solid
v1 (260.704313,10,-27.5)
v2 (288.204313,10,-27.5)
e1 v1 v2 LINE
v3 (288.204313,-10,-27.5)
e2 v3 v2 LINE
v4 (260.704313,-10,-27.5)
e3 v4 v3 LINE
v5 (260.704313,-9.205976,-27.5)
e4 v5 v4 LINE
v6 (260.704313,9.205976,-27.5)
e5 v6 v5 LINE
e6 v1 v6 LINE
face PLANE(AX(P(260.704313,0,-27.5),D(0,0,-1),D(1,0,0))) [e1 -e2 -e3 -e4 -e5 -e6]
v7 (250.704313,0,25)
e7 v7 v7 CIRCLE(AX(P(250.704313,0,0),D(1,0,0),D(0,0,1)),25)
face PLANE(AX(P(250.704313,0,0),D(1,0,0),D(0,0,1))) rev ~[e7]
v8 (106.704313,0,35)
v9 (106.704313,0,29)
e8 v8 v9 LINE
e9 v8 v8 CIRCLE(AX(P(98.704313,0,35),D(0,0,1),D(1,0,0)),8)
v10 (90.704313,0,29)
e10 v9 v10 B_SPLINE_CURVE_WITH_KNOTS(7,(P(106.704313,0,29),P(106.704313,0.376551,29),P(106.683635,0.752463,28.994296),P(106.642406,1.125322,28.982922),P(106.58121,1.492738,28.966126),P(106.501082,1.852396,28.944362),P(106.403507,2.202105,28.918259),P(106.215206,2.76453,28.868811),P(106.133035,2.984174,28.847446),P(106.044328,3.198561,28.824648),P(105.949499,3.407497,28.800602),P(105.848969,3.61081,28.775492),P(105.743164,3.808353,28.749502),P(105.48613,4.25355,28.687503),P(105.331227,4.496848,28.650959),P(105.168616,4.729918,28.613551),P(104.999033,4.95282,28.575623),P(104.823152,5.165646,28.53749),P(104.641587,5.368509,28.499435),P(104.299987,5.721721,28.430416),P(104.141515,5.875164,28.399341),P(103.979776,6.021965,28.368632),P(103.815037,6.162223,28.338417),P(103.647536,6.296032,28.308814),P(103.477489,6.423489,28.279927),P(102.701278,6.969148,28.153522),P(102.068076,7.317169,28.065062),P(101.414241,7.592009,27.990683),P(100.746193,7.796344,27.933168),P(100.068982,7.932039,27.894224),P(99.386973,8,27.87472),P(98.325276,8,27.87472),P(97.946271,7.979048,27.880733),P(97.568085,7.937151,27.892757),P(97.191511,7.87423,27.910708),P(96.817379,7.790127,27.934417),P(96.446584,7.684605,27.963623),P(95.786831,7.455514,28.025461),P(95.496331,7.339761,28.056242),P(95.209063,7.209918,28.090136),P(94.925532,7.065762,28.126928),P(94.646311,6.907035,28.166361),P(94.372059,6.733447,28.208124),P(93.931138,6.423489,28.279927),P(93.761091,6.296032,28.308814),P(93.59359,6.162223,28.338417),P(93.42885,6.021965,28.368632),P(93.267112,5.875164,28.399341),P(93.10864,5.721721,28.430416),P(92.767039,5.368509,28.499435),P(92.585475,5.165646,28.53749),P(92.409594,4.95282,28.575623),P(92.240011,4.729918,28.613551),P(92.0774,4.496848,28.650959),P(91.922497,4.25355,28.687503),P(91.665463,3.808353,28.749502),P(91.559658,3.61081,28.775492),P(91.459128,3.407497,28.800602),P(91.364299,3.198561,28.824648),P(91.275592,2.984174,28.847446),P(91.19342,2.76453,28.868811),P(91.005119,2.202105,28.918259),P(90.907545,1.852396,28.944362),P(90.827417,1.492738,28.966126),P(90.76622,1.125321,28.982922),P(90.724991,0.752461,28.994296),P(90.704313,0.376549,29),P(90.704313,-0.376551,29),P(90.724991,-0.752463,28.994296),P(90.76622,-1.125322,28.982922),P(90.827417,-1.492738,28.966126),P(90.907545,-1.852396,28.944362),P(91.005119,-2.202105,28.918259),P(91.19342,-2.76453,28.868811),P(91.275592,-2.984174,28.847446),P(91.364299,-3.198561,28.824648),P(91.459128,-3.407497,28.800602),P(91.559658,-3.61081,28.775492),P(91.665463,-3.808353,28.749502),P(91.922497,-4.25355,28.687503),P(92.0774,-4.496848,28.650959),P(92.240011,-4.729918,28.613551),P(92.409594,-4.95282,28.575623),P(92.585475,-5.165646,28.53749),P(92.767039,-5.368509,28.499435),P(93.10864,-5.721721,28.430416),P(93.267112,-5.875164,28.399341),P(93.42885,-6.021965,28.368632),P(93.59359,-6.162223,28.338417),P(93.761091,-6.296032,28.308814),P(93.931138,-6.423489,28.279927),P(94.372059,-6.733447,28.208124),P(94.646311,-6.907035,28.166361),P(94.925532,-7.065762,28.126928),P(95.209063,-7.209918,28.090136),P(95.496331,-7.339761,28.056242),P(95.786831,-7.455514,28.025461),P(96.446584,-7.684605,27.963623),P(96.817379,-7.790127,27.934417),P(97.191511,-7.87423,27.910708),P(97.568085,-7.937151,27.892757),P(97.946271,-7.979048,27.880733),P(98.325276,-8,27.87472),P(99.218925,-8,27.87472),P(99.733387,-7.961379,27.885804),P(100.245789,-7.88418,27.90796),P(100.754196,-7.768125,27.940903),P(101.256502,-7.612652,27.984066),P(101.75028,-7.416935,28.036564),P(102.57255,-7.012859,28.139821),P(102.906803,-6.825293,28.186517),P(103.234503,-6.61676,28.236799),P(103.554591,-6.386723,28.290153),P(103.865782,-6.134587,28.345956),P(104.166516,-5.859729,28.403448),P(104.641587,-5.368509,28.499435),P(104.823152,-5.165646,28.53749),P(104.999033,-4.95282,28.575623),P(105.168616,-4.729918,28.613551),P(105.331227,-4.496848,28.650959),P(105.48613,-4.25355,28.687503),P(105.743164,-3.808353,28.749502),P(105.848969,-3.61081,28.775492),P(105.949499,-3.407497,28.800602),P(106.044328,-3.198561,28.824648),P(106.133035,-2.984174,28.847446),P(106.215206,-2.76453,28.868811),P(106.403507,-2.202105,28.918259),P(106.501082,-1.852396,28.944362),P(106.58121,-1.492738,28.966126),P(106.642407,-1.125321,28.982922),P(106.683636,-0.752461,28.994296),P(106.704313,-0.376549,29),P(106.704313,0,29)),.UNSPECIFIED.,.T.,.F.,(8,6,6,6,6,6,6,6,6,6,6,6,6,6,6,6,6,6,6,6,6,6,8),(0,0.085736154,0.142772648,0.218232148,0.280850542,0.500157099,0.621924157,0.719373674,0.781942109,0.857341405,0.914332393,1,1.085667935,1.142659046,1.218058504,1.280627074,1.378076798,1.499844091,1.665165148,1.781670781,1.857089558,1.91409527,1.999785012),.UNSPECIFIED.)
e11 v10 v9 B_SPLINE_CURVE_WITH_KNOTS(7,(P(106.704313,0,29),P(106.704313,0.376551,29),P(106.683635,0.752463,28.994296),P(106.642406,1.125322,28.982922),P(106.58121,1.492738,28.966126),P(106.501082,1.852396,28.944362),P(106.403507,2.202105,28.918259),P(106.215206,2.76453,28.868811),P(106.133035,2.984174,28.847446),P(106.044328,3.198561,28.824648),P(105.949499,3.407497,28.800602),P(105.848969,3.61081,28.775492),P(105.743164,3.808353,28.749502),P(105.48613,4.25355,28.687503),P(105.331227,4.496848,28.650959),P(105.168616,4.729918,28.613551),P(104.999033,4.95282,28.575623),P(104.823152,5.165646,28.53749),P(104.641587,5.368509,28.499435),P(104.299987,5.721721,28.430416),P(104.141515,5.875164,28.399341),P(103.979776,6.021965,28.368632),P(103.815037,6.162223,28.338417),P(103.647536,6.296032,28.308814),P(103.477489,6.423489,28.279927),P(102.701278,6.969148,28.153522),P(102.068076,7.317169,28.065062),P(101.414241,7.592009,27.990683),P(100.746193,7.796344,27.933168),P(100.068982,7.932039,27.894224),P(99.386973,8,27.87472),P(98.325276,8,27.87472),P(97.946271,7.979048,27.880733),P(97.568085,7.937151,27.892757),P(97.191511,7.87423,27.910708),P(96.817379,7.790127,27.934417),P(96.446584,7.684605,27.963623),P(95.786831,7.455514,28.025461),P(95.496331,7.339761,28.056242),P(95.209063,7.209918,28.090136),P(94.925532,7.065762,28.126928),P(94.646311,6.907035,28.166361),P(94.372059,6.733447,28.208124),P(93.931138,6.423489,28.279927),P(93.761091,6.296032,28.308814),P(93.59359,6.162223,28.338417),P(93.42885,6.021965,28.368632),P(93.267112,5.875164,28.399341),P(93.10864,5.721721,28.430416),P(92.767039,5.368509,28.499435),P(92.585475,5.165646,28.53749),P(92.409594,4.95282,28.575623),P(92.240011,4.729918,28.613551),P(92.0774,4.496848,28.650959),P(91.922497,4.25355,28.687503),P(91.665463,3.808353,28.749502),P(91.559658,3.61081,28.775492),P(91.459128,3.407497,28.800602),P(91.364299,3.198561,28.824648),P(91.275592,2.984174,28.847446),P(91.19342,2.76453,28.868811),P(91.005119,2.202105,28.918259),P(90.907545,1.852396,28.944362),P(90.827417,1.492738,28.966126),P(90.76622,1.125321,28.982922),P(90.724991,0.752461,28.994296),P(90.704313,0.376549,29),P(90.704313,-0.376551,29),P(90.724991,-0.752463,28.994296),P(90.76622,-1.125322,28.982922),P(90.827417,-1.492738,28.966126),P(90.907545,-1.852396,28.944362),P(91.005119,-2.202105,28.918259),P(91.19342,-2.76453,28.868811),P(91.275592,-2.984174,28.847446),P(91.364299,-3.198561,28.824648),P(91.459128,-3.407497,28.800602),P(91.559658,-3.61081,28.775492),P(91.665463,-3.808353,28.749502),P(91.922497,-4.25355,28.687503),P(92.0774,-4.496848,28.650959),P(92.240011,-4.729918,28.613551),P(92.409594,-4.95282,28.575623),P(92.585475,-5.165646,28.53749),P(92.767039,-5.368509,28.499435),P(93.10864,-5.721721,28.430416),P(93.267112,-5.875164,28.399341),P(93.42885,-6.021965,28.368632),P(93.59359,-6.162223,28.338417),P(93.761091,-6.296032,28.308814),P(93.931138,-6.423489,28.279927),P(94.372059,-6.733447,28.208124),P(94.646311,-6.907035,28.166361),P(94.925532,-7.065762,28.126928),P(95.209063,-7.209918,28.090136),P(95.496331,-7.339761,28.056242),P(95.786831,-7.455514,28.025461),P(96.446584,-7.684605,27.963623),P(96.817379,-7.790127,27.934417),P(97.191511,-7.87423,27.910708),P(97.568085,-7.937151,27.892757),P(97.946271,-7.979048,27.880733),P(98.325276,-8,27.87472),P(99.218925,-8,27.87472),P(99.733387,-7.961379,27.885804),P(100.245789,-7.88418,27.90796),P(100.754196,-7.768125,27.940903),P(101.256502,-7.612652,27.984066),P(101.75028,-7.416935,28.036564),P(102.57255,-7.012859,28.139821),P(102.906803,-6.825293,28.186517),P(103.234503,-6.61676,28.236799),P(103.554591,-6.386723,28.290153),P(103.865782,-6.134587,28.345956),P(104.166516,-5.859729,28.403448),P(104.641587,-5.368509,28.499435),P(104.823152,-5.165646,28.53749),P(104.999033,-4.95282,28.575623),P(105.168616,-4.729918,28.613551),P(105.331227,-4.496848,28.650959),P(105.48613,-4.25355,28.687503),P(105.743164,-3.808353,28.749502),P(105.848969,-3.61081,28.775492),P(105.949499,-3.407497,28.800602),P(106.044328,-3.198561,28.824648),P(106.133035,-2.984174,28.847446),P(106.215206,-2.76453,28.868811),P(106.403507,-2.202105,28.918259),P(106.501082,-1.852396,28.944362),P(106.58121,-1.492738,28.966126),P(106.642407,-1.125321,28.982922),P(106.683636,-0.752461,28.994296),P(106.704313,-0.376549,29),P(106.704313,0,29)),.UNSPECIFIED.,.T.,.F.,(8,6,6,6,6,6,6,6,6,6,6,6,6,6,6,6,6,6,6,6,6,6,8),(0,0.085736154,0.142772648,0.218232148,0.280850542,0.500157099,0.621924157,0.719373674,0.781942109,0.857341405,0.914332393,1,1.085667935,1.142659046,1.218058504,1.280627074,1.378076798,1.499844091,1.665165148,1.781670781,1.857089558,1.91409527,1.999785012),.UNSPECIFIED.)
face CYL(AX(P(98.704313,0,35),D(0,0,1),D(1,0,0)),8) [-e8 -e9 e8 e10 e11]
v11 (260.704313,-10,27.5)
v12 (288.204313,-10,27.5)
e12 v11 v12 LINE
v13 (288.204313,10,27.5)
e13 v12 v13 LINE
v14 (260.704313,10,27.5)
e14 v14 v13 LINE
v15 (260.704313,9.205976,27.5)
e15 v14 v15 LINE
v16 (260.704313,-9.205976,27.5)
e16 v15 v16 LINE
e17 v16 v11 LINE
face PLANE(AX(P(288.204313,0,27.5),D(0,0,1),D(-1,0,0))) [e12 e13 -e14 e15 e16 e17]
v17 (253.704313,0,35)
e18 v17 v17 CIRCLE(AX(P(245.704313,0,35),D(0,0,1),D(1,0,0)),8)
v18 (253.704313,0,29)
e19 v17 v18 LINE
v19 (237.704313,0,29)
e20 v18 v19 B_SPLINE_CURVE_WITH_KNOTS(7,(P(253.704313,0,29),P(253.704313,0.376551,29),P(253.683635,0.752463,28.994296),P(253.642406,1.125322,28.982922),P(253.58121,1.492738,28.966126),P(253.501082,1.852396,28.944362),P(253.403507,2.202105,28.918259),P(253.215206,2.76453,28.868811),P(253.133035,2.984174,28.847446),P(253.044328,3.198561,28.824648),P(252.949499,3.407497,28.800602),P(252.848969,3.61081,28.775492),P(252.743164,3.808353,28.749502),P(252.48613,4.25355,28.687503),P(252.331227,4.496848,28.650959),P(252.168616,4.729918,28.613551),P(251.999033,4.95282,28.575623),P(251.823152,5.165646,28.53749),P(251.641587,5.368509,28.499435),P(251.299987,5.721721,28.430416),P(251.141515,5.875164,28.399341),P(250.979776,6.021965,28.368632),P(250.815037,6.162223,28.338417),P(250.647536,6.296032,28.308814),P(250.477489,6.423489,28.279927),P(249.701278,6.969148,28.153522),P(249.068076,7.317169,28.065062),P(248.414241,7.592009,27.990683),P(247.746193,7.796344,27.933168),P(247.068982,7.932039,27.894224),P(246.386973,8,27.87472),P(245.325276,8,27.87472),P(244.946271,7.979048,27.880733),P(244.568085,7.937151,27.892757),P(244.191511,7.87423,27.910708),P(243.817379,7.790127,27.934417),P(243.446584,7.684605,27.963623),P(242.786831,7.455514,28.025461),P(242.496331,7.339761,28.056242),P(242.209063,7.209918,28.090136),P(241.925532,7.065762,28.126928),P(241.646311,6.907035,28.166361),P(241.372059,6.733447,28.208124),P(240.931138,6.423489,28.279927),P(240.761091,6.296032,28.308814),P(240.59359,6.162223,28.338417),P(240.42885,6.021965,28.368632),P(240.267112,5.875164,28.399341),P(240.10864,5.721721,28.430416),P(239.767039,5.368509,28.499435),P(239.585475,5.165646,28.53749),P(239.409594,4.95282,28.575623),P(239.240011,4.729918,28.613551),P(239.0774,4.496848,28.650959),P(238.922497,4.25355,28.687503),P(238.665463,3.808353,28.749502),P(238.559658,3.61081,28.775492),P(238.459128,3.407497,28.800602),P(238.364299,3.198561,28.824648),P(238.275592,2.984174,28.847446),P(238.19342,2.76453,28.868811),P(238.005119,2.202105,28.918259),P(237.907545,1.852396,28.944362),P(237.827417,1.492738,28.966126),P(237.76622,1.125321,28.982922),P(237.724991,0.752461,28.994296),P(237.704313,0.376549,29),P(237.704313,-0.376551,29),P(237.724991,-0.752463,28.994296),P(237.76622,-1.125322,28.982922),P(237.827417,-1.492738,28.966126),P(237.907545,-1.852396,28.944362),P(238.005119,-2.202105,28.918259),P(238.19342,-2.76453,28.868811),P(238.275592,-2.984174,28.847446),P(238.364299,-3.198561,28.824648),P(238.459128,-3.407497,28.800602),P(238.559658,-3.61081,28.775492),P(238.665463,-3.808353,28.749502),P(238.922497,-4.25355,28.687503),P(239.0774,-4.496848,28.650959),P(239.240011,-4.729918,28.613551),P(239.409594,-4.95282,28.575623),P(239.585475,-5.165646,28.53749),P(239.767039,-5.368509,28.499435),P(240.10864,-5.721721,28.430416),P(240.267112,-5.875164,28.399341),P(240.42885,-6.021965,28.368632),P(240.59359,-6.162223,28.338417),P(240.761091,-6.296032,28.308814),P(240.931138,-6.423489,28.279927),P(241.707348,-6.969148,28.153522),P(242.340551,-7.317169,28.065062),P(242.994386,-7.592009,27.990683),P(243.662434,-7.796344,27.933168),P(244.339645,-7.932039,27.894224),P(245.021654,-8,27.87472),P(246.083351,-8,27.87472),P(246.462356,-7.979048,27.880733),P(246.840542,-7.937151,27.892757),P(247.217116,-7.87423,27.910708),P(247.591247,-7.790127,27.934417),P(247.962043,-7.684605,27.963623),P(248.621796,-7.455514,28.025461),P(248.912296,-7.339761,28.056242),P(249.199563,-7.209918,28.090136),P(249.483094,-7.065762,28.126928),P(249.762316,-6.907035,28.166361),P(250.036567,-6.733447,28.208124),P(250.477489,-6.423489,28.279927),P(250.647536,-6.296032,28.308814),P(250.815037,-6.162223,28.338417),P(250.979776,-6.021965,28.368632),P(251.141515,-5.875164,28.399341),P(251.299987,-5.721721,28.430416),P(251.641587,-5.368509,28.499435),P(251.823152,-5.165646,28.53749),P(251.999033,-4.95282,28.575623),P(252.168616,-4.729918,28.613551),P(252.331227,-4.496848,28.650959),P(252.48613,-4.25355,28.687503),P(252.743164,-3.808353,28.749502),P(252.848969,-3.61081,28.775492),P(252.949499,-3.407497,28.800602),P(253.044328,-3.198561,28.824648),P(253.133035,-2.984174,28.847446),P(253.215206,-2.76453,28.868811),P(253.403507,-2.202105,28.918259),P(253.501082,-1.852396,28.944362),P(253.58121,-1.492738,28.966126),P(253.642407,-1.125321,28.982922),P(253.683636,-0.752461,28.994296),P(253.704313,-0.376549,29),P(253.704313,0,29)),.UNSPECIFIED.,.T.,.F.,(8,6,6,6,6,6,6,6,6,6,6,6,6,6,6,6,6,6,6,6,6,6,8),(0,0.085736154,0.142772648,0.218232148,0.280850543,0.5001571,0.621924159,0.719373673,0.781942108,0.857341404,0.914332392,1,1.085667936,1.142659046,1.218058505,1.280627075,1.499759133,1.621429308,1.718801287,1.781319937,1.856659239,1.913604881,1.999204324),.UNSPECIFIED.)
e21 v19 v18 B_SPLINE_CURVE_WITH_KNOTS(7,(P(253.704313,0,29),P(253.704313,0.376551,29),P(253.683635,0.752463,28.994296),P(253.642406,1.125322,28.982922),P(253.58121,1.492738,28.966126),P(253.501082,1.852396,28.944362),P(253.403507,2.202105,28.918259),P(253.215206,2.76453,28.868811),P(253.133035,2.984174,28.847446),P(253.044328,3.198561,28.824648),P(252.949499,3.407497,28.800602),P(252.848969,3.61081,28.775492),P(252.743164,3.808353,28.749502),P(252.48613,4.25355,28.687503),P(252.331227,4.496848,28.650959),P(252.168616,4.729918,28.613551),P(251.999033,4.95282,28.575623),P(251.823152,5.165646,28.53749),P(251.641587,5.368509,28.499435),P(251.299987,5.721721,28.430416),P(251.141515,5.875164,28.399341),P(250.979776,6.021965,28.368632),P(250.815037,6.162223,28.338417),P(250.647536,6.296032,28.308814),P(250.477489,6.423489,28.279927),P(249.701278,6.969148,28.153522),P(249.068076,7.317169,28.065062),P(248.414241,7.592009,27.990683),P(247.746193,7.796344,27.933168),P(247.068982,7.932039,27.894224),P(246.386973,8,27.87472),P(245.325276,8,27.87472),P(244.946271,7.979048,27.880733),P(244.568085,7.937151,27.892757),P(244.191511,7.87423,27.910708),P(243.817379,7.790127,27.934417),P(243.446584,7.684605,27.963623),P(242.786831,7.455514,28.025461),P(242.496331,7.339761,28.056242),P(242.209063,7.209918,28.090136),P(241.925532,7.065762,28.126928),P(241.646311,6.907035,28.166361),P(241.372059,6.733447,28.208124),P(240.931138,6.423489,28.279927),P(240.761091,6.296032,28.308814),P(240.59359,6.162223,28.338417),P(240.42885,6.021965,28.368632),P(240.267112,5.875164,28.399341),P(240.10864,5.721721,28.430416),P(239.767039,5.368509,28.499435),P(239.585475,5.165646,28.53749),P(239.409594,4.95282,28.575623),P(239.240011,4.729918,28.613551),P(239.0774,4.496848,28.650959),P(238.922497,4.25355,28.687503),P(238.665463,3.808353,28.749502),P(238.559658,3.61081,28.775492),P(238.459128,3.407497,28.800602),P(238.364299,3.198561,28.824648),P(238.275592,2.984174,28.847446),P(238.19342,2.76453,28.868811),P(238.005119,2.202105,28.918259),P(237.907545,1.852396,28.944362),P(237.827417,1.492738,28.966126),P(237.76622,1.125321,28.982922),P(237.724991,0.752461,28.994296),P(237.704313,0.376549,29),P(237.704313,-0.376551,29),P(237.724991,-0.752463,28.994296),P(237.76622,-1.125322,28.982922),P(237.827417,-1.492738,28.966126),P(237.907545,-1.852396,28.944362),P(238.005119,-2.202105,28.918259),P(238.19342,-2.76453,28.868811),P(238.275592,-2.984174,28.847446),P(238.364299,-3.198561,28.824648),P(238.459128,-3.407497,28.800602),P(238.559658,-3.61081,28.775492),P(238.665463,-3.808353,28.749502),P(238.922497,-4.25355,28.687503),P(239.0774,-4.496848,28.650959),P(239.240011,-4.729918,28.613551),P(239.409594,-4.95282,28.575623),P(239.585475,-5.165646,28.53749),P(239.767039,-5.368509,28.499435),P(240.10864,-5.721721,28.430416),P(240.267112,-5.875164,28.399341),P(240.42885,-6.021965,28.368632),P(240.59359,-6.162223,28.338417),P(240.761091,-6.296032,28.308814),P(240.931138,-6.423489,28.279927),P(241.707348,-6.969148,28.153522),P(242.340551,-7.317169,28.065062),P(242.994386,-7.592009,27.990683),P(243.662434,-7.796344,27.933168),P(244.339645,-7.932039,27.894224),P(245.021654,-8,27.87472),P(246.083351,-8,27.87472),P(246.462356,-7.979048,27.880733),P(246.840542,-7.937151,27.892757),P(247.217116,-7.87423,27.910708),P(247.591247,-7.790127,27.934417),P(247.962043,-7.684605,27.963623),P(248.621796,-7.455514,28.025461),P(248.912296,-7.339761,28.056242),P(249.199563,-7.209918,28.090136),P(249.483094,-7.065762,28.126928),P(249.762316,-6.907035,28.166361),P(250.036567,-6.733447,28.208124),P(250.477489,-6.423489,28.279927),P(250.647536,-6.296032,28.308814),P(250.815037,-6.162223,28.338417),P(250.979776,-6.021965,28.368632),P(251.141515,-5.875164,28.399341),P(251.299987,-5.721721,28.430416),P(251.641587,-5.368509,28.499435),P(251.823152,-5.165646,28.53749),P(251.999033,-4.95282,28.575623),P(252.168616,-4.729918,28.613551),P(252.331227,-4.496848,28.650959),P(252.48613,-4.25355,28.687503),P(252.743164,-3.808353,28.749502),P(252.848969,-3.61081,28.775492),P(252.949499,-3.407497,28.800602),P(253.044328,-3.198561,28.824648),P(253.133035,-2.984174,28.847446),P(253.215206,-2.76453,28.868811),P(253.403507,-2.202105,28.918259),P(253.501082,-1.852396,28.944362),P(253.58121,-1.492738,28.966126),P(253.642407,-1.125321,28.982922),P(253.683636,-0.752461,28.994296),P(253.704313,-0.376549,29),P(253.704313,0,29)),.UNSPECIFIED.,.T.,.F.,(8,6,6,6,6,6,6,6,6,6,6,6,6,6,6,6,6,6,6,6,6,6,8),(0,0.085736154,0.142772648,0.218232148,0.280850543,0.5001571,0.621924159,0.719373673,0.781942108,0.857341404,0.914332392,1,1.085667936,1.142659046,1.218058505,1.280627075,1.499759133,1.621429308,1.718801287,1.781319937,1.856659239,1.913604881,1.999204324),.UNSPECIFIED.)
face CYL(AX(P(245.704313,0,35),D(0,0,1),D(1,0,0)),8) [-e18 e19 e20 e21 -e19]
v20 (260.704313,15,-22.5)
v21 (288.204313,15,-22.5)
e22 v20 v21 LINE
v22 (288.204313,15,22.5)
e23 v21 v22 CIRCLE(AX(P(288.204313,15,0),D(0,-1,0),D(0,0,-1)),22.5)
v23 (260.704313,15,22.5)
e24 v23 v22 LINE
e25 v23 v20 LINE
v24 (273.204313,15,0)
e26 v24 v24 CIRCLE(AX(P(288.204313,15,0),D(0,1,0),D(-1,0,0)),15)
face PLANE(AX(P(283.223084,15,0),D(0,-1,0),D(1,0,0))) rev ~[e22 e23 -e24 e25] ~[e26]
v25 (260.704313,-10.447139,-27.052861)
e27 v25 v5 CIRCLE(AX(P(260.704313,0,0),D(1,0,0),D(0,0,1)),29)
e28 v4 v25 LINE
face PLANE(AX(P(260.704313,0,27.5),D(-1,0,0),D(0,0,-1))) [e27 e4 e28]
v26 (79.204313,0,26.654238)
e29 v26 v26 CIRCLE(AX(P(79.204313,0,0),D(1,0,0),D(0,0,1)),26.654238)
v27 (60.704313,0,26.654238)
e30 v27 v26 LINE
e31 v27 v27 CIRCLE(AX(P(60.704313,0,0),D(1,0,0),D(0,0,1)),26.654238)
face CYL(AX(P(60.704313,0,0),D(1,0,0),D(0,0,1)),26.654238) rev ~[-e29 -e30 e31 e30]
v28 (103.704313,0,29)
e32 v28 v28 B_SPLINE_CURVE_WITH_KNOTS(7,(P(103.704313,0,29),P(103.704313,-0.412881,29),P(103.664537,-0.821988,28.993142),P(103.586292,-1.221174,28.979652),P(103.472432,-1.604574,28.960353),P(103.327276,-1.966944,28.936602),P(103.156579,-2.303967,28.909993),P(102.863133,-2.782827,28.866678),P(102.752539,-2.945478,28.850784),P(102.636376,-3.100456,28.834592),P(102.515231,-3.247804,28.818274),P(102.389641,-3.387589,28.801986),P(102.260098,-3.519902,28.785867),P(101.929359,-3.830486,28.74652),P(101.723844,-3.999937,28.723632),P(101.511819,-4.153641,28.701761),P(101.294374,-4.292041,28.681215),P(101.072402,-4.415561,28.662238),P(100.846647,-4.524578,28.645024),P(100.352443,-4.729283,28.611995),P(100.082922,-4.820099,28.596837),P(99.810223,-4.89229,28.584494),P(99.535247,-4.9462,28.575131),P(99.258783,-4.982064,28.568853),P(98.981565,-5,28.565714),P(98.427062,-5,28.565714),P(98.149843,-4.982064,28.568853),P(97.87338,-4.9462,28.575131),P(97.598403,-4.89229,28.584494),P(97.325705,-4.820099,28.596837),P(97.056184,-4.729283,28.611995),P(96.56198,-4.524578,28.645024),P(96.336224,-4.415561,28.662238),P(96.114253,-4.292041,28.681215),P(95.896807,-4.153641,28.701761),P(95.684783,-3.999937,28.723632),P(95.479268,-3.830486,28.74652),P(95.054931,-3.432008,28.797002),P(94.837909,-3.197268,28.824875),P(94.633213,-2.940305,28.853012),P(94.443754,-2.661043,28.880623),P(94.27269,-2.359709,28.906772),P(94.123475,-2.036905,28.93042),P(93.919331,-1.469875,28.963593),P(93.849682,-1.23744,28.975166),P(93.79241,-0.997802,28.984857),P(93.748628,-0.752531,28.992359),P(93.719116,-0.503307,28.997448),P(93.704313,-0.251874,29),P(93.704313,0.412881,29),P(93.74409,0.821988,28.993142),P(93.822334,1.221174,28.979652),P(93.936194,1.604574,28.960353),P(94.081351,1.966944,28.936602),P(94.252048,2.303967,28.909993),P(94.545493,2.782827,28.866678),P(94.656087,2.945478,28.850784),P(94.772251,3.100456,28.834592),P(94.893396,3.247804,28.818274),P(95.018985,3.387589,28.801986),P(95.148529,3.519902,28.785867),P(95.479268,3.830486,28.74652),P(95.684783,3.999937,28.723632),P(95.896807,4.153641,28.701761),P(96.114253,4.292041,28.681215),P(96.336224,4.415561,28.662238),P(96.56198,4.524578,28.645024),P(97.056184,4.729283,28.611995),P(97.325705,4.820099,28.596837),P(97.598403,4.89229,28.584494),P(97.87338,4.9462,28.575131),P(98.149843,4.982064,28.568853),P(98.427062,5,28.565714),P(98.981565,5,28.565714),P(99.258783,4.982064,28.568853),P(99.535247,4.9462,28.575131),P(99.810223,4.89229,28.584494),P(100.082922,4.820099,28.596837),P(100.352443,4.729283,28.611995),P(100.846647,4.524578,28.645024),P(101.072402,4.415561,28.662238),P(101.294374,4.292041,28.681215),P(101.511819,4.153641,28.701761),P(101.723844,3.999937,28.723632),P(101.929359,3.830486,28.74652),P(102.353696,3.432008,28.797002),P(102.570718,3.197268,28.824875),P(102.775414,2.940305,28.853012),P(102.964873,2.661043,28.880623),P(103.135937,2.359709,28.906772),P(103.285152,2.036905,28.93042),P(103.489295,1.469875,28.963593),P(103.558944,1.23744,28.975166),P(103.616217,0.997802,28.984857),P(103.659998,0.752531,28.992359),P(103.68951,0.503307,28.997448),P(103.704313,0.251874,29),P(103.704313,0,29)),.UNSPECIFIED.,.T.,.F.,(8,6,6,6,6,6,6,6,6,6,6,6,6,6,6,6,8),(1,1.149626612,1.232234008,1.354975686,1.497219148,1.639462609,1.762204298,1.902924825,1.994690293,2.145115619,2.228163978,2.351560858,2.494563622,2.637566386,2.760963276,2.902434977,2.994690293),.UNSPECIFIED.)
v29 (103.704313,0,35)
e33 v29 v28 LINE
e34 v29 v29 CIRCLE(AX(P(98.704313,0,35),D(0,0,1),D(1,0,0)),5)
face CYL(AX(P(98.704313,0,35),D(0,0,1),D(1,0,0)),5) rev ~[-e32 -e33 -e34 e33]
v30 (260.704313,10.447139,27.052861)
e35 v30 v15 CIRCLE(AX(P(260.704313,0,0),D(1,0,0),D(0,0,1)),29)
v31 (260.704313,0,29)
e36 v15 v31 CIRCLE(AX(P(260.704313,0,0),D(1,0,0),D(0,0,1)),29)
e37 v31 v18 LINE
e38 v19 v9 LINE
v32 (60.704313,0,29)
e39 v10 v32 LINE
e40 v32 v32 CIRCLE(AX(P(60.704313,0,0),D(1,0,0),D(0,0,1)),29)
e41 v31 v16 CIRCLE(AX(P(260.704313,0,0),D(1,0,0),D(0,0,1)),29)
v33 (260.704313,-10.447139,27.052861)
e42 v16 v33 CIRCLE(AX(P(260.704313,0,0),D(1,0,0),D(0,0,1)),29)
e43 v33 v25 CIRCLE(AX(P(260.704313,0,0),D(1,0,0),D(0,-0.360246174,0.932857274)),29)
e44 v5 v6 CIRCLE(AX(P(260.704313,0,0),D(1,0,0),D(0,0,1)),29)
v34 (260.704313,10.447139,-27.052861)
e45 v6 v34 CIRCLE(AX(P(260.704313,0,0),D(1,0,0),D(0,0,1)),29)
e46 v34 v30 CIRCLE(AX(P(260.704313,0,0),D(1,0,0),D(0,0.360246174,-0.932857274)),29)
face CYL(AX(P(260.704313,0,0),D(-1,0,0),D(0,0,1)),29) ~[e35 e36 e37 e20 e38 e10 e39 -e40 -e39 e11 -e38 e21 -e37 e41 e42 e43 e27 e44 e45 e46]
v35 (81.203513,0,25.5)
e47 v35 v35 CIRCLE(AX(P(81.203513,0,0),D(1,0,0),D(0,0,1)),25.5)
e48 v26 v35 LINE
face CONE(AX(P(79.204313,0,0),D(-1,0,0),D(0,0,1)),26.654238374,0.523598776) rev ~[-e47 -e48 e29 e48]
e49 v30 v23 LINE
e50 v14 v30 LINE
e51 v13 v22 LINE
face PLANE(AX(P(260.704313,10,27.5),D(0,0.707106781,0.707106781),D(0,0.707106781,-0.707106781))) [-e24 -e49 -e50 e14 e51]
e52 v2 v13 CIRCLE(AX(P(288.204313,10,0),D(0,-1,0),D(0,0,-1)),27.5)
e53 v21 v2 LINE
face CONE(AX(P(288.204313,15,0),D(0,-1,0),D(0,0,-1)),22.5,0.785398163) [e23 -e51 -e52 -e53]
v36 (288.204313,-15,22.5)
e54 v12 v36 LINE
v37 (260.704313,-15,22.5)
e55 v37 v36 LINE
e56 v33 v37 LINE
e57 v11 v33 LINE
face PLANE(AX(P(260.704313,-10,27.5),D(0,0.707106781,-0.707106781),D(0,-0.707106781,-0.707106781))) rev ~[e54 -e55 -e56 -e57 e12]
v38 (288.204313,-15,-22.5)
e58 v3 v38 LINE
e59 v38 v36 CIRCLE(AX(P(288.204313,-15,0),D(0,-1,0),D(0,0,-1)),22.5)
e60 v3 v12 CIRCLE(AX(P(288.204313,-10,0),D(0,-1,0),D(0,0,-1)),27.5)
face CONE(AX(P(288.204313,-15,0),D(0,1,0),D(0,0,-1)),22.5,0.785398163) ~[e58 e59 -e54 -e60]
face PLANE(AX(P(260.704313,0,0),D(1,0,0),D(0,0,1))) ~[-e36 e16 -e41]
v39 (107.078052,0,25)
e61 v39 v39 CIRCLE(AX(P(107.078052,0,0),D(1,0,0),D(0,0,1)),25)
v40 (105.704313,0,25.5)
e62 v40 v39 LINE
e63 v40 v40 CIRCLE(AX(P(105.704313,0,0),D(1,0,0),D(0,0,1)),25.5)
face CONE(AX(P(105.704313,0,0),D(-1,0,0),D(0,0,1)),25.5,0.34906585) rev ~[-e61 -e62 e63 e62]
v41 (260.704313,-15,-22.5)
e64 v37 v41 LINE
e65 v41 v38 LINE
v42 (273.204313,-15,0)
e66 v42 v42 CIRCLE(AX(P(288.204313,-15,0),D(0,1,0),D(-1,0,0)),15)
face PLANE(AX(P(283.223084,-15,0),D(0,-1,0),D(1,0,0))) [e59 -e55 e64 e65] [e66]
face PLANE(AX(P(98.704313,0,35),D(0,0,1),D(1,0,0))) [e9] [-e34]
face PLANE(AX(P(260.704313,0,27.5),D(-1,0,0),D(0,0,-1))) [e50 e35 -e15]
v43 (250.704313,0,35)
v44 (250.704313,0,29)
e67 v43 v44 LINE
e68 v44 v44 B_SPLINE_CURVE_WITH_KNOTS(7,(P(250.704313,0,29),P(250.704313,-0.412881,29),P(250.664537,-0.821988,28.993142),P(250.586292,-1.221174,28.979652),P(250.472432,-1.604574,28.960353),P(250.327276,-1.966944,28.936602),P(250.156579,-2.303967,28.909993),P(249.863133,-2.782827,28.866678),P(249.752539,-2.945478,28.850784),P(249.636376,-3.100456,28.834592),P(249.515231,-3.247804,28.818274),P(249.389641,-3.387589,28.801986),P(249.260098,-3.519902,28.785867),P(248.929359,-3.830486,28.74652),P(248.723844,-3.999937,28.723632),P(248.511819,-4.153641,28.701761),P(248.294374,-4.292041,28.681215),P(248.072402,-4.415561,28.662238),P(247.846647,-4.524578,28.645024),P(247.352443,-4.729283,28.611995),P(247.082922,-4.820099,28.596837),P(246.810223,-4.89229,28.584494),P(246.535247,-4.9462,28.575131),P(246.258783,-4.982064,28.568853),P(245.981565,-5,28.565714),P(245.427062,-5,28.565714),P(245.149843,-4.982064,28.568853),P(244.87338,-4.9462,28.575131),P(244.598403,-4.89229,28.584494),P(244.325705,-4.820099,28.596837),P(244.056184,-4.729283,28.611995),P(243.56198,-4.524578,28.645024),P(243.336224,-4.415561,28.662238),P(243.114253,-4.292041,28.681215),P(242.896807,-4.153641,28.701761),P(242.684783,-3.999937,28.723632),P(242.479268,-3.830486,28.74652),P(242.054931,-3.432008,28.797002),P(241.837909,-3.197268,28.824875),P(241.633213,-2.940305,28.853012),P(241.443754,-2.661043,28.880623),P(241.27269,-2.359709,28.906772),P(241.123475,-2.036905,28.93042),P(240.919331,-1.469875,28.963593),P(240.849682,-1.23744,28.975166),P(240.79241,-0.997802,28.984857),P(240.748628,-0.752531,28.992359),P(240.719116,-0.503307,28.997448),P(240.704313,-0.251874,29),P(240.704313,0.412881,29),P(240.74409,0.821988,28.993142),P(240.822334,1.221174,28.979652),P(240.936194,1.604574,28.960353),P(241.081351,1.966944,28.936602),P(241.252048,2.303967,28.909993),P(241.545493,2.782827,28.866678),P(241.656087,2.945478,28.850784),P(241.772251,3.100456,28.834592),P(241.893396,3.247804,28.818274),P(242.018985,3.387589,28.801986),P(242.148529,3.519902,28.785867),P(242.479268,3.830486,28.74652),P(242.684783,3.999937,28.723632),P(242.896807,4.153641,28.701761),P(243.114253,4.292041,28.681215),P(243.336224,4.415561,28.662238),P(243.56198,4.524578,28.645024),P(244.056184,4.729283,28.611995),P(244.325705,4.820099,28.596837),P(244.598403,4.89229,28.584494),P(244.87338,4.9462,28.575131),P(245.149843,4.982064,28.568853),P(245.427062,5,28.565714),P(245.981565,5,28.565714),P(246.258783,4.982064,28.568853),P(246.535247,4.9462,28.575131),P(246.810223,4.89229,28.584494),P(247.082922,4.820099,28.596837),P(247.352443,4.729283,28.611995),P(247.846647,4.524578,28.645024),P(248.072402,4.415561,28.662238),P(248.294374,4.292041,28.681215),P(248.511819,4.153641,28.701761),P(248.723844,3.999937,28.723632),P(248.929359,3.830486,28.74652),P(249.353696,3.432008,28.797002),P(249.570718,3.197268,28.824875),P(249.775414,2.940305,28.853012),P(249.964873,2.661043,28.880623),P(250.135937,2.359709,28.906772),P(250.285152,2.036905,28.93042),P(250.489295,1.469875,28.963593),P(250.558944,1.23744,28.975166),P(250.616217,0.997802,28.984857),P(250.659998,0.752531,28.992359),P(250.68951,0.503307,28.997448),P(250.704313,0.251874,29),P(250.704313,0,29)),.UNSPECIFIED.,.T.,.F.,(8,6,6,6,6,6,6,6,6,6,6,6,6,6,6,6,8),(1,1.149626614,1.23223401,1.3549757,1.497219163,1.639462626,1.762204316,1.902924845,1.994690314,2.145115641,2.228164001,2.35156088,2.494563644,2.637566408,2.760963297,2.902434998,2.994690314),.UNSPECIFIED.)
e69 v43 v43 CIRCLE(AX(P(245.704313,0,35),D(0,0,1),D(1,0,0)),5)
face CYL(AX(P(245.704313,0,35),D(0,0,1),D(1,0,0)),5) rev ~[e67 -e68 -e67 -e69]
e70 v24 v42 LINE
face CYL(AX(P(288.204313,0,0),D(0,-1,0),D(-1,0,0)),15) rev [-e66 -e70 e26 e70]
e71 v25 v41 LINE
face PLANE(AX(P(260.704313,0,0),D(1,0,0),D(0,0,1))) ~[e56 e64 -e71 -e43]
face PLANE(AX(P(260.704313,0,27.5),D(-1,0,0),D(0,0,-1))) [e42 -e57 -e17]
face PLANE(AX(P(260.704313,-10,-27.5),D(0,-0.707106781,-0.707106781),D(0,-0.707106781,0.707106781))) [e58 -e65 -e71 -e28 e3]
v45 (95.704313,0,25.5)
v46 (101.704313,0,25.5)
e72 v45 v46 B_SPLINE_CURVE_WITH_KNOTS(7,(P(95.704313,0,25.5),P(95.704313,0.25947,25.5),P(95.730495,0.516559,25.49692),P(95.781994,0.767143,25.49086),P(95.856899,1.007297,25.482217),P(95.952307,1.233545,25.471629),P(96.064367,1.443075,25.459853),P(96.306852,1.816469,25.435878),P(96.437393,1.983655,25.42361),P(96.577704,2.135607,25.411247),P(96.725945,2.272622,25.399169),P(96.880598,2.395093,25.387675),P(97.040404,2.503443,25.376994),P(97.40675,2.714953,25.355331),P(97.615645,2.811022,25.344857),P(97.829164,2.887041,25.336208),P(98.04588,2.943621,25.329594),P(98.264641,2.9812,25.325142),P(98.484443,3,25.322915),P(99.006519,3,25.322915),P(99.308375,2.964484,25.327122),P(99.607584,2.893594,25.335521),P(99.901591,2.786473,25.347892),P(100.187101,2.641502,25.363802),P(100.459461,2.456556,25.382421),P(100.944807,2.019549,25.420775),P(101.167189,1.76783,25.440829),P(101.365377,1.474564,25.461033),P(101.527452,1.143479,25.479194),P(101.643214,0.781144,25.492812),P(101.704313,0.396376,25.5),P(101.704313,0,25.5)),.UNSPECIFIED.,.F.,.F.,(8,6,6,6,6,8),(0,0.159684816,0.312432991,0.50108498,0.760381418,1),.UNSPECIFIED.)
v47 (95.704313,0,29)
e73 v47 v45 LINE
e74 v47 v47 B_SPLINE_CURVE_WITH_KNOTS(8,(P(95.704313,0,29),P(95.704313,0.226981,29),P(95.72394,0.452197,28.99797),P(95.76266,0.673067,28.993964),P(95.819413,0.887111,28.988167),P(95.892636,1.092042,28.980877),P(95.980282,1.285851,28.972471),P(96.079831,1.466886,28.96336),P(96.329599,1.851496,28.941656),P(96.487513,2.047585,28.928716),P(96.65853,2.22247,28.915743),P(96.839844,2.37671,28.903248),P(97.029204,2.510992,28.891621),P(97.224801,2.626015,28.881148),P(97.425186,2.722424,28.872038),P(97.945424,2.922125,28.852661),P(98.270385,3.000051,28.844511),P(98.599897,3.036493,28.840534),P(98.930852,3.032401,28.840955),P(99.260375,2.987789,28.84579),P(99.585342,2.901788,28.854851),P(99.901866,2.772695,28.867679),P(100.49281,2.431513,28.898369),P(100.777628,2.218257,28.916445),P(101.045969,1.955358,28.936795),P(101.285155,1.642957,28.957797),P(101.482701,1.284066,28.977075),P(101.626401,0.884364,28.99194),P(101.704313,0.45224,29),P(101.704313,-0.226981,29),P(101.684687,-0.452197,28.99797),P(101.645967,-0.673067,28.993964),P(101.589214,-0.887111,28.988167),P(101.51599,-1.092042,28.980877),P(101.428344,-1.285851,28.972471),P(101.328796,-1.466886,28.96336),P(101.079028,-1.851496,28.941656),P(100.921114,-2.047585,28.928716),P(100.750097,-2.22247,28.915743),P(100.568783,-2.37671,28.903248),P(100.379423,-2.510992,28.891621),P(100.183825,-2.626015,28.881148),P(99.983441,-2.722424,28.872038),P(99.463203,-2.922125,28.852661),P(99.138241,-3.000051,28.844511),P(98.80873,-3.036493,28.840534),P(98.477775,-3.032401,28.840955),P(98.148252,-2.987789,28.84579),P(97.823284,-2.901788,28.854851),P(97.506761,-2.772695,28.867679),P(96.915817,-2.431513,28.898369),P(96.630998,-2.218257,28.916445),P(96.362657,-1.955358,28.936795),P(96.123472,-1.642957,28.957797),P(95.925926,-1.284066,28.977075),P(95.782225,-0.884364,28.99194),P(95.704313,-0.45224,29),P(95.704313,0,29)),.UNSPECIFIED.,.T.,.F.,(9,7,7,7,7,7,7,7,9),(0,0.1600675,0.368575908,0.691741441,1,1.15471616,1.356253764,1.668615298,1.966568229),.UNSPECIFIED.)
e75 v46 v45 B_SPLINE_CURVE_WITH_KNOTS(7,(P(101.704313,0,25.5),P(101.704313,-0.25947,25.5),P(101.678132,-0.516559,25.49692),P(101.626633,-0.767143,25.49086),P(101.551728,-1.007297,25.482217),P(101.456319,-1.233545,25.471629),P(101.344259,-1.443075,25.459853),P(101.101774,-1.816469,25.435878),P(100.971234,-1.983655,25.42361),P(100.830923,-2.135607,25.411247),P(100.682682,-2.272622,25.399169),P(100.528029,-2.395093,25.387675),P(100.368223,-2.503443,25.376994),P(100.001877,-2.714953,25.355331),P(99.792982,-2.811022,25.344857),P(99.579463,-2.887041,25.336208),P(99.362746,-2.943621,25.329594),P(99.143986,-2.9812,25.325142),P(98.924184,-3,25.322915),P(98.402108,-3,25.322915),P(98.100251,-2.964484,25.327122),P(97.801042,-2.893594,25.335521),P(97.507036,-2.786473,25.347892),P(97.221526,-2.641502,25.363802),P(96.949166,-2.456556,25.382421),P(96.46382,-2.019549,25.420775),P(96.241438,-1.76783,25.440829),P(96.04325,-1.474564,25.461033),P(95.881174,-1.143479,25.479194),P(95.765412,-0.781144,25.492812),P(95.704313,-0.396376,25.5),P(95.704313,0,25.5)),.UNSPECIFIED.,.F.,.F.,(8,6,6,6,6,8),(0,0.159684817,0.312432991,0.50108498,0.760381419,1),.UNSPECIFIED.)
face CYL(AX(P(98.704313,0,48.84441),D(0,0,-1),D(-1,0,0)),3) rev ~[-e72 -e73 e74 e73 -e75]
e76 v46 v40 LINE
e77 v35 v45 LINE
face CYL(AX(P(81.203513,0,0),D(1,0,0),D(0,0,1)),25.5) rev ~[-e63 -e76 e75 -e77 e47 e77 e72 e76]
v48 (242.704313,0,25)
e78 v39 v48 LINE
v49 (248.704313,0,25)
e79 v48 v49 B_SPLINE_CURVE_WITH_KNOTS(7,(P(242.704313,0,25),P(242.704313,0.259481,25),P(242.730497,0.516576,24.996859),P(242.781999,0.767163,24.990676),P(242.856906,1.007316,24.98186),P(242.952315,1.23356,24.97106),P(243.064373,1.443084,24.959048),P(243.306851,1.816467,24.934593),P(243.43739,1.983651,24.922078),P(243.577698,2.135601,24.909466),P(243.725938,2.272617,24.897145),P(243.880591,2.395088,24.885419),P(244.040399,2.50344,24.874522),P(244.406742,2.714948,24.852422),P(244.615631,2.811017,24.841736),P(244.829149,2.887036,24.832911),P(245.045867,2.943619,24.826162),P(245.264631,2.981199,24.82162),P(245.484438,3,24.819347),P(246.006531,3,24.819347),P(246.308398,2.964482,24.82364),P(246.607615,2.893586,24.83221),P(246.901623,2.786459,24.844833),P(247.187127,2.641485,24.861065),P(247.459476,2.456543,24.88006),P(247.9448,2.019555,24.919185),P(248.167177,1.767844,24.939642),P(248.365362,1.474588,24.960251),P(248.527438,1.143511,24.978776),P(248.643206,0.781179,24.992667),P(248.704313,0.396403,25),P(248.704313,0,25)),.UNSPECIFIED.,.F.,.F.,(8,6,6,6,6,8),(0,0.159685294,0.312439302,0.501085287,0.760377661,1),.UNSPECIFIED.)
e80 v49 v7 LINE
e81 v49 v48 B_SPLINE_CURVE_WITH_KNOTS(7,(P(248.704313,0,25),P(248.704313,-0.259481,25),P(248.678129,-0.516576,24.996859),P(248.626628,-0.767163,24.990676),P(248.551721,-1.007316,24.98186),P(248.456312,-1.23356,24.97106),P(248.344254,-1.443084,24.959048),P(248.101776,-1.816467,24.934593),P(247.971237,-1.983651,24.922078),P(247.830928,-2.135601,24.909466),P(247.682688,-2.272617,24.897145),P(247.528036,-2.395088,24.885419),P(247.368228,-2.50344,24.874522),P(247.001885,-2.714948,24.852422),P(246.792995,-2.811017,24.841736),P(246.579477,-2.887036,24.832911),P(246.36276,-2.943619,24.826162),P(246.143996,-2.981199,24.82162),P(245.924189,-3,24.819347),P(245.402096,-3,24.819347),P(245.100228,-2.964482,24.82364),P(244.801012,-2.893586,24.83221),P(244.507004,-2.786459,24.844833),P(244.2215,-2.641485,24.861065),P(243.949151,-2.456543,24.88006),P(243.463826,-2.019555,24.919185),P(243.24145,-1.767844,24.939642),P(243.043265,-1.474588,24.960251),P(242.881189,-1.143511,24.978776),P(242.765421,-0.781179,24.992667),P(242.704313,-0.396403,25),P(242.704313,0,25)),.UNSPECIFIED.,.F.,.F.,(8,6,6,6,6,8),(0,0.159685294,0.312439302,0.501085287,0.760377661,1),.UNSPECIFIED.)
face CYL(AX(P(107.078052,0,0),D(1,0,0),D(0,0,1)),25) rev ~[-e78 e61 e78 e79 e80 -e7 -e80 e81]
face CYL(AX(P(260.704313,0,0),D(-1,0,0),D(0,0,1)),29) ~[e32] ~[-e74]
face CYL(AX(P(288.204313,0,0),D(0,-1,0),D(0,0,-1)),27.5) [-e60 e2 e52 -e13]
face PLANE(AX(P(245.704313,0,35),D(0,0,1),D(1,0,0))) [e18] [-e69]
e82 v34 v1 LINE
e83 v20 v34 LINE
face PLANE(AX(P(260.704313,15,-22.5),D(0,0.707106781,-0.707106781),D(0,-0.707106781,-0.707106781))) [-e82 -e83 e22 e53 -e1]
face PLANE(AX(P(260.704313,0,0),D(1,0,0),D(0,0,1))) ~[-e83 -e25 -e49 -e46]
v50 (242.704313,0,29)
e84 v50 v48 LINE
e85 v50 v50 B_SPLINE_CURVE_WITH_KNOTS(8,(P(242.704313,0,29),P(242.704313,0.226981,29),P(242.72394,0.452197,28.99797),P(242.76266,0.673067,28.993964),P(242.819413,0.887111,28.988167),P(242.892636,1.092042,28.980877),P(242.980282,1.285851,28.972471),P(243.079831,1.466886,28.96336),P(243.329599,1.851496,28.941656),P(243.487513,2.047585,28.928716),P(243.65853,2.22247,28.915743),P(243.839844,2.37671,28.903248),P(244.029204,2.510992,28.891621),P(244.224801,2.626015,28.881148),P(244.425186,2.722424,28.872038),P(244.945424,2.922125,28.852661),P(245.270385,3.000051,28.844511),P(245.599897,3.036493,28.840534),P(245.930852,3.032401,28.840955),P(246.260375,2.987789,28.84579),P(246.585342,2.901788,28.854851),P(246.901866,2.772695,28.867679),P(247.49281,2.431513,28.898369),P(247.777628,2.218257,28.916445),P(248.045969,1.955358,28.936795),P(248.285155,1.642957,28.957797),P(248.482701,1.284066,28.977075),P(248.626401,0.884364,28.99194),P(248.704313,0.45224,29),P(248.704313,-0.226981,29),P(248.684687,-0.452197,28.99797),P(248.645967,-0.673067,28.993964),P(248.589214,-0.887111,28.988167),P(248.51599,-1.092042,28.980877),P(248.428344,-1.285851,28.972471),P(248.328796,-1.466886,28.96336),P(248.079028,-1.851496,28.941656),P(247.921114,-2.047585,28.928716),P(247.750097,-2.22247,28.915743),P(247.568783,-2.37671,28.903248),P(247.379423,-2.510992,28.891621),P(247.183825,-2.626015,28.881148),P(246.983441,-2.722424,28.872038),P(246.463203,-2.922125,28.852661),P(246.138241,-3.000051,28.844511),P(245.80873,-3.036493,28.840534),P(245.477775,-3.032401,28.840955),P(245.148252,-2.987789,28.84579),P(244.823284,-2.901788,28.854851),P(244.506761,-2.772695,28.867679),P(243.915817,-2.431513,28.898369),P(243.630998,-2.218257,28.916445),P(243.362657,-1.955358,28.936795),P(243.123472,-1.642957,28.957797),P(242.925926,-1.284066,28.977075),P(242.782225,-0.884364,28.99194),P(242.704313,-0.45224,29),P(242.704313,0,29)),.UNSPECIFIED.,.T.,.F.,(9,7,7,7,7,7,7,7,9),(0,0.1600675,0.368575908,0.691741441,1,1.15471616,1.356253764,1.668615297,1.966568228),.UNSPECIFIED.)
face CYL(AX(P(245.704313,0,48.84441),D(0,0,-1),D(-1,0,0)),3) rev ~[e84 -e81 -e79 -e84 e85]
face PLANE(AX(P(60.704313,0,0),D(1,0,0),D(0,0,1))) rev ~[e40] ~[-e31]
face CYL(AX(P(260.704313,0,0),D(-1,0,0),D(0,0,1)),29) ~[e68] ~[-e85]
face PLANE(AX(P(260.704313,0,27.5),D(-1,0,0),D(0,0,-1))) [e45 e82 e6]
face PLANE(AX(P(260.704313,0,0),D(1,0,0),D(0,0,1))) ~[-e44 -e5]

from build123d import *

# Parameters (mm, degrees)
F4_DEPTH    = 15
F5_T1_DEPTH = 27.5
F5_T4_ANGLE = 180
F5_T6_ANGLE = 180
F7_R        = 8
F7_R_2      = 5
F9_D        = 6
F9_DEPTH    = 20
F9_START    = 6.1555899
F9_TIP      = 1.8025818571
F10_D       = 6
F10_DEPTH   = 20
F10_START   = 6.1555899
F10_TIP     = 1.8025818571


# Not quite as in the source:
# - a fillet or chamfer that OpenCascade refuses, or shapes differently, is made with other operations: its cross-section is extruded or revolved along the edge and cut away or added


with BuildPart() as f3:
    # F2 (on Front) → F3 (revolve)
    with BuildSketch(Plane.XZ):
        Polygon((105.0486442498, 29), (98.7043133404, 29), (98.7043133404, 25.5), (105.7043133404, 25.5), (107.0780520501, 25), (250.7043133404, 25), (250.7043133404, 0), (260.7043133404, 0), (260.7043133404, 27.5), (260.7043133404, 29), align=None)
        Polygon((92.3599824309, 29), (60.7043133404, 29), (60.7043133404, 26.6542383736), (79.2043133404, 26.6542383736), (81.2035128474, 25.5), (98.7043133404, 25.5), (98.7043133404, 29), align=None)
    revolve(axis=Axis((125.4885941744, 0, 0), (1, 0, 0)))

    # F2 (on Front) → F4 (join, symmetric)
    with BuildSketch(Plane.XZ):
        with BuildLine():
            Line((288.2043133404, 27.5), (260.7043133404, 27.5))
            Line((260.7043133404, 27.5), (260.7043133404, 0))
            Line((260.7043133404, 0), (260.7043133404, -27.5))
            Line((260.7043133404, -27.5), (288.2043133404, -27.5))
            ThreePointArc((288.2043133404, -27.5), (315.7043133404, 0), (288.2043133404, 27.5))
        make_face()
        with BuildLine():
            ThreePointArc((303.2043133404, 0), (288.2043133404, -15), (273.2043133404, 0))
            ThreePointArc((273.2043133404, 0), (288.2043133404, 15), (303.2043133404, 0))
        make_face(mode=Mode.SUBTRACT)
    extrude(amount=F4_DEPTH, both=True)

    # F5: chamfer of 5 on 6 edges, made by hand

    # F5_s2 → F5_t1 (cut)
    with BuildSketch(Plane.YZ.offset(260.7043133404)):
        Polygon((-10, 27.5), (-15, 22.5), (-15, 27.5), align=None)
        Polygon((10, 27.5), (15, 22.5), (15, 27.5), align=None)
        Polygon((15, -22.5), (10, -27.5), (15, -27.5), align=None)
        Polygon((-10, -27.5), (-15, -22.5), (-15, -27.5), align=None)
    extrude(amount=F5_T1_DEPTH, mode=Mode.SUBTRACT)

    # F5_s3 → F5_t4 (revolve, cut)
    with BuildSketch(Plane.YZ.offset(288.2043133404)):
        Polygon((15, -22.5), (10, -27.5), (15, -27.5), align=None)
    revolve(axis=Axis((288.2043133404, 15, 0), (0, -1, 0)), revolution_arc=F5_T4_ANGLE, mode=Mode.SUBTRACT)

    # F5_s5 → F5_t6 (revolve, cut)
    with BuildSketch(Plane.YZ.offset(288.2043133404)):
        Polygon((-15, -22.5), (-10, -27.5), (-15, -27.5), align=None)
    revolve(axis=Axis((288.2043133404, -15, 0), (0, -1, 0)), revolution_arc=F5_T6_ANGLE, mode=Mode.SUBTRACT)

    # F7 (on offset) → F8 (join, up to the next surface of F3)
    with BuildSketch(Plane.XY.offset(35)):
        with Locations((98.7043133404, 0)):
            Circle(F7_R)
        with Locations((98.7043133404, 0)):
            Circle(F7_R_2, mode=Mode.SUBTRACT)
        with Locations((245.7043133404, 0)):
            Circle(F7_R)
        with Locations((245.7043133404, 0)):
            Circle(F7_R_2, mode=Mode.SUBTRACT)
    extrude(until=Until.NEXT, dir=(0, 0, -1))

    # F9
    # its depths count from where the whole tool has entered the part; down to there all is cleared
    with Locations(Plane.XY.offset(35).offset(-F9_START)):
        with Locations((98.7043133404, 0)):
            Hole(F9_D / 2, depth=F9_DEPTH)
            with Locations((0, 0, -(F9_DEPTH + F9_TIP / 2))):  # 118° drill point
                Cone(0, F9_D / 2, F9_TIP, mode=Mode.SUBTRACT)

    # F10
    # its depths count from where the whole tool has entered the part; down to there all is cleared
    with Locations(Plane.XY.offset(35).offset(-F10_START)):
        with Locations((245.7043133404, 0)):
            Hole(F10_D / 2, depth=F10_DEPTH)
            with Locations((0, 0, -(F10_DEPTH + F10_TIP / 2))):  # 118° drill point
                Cone(0, F10_D / 2, F10_TIP, mode=Mode.SUBTRACT)


solid = f3.part
